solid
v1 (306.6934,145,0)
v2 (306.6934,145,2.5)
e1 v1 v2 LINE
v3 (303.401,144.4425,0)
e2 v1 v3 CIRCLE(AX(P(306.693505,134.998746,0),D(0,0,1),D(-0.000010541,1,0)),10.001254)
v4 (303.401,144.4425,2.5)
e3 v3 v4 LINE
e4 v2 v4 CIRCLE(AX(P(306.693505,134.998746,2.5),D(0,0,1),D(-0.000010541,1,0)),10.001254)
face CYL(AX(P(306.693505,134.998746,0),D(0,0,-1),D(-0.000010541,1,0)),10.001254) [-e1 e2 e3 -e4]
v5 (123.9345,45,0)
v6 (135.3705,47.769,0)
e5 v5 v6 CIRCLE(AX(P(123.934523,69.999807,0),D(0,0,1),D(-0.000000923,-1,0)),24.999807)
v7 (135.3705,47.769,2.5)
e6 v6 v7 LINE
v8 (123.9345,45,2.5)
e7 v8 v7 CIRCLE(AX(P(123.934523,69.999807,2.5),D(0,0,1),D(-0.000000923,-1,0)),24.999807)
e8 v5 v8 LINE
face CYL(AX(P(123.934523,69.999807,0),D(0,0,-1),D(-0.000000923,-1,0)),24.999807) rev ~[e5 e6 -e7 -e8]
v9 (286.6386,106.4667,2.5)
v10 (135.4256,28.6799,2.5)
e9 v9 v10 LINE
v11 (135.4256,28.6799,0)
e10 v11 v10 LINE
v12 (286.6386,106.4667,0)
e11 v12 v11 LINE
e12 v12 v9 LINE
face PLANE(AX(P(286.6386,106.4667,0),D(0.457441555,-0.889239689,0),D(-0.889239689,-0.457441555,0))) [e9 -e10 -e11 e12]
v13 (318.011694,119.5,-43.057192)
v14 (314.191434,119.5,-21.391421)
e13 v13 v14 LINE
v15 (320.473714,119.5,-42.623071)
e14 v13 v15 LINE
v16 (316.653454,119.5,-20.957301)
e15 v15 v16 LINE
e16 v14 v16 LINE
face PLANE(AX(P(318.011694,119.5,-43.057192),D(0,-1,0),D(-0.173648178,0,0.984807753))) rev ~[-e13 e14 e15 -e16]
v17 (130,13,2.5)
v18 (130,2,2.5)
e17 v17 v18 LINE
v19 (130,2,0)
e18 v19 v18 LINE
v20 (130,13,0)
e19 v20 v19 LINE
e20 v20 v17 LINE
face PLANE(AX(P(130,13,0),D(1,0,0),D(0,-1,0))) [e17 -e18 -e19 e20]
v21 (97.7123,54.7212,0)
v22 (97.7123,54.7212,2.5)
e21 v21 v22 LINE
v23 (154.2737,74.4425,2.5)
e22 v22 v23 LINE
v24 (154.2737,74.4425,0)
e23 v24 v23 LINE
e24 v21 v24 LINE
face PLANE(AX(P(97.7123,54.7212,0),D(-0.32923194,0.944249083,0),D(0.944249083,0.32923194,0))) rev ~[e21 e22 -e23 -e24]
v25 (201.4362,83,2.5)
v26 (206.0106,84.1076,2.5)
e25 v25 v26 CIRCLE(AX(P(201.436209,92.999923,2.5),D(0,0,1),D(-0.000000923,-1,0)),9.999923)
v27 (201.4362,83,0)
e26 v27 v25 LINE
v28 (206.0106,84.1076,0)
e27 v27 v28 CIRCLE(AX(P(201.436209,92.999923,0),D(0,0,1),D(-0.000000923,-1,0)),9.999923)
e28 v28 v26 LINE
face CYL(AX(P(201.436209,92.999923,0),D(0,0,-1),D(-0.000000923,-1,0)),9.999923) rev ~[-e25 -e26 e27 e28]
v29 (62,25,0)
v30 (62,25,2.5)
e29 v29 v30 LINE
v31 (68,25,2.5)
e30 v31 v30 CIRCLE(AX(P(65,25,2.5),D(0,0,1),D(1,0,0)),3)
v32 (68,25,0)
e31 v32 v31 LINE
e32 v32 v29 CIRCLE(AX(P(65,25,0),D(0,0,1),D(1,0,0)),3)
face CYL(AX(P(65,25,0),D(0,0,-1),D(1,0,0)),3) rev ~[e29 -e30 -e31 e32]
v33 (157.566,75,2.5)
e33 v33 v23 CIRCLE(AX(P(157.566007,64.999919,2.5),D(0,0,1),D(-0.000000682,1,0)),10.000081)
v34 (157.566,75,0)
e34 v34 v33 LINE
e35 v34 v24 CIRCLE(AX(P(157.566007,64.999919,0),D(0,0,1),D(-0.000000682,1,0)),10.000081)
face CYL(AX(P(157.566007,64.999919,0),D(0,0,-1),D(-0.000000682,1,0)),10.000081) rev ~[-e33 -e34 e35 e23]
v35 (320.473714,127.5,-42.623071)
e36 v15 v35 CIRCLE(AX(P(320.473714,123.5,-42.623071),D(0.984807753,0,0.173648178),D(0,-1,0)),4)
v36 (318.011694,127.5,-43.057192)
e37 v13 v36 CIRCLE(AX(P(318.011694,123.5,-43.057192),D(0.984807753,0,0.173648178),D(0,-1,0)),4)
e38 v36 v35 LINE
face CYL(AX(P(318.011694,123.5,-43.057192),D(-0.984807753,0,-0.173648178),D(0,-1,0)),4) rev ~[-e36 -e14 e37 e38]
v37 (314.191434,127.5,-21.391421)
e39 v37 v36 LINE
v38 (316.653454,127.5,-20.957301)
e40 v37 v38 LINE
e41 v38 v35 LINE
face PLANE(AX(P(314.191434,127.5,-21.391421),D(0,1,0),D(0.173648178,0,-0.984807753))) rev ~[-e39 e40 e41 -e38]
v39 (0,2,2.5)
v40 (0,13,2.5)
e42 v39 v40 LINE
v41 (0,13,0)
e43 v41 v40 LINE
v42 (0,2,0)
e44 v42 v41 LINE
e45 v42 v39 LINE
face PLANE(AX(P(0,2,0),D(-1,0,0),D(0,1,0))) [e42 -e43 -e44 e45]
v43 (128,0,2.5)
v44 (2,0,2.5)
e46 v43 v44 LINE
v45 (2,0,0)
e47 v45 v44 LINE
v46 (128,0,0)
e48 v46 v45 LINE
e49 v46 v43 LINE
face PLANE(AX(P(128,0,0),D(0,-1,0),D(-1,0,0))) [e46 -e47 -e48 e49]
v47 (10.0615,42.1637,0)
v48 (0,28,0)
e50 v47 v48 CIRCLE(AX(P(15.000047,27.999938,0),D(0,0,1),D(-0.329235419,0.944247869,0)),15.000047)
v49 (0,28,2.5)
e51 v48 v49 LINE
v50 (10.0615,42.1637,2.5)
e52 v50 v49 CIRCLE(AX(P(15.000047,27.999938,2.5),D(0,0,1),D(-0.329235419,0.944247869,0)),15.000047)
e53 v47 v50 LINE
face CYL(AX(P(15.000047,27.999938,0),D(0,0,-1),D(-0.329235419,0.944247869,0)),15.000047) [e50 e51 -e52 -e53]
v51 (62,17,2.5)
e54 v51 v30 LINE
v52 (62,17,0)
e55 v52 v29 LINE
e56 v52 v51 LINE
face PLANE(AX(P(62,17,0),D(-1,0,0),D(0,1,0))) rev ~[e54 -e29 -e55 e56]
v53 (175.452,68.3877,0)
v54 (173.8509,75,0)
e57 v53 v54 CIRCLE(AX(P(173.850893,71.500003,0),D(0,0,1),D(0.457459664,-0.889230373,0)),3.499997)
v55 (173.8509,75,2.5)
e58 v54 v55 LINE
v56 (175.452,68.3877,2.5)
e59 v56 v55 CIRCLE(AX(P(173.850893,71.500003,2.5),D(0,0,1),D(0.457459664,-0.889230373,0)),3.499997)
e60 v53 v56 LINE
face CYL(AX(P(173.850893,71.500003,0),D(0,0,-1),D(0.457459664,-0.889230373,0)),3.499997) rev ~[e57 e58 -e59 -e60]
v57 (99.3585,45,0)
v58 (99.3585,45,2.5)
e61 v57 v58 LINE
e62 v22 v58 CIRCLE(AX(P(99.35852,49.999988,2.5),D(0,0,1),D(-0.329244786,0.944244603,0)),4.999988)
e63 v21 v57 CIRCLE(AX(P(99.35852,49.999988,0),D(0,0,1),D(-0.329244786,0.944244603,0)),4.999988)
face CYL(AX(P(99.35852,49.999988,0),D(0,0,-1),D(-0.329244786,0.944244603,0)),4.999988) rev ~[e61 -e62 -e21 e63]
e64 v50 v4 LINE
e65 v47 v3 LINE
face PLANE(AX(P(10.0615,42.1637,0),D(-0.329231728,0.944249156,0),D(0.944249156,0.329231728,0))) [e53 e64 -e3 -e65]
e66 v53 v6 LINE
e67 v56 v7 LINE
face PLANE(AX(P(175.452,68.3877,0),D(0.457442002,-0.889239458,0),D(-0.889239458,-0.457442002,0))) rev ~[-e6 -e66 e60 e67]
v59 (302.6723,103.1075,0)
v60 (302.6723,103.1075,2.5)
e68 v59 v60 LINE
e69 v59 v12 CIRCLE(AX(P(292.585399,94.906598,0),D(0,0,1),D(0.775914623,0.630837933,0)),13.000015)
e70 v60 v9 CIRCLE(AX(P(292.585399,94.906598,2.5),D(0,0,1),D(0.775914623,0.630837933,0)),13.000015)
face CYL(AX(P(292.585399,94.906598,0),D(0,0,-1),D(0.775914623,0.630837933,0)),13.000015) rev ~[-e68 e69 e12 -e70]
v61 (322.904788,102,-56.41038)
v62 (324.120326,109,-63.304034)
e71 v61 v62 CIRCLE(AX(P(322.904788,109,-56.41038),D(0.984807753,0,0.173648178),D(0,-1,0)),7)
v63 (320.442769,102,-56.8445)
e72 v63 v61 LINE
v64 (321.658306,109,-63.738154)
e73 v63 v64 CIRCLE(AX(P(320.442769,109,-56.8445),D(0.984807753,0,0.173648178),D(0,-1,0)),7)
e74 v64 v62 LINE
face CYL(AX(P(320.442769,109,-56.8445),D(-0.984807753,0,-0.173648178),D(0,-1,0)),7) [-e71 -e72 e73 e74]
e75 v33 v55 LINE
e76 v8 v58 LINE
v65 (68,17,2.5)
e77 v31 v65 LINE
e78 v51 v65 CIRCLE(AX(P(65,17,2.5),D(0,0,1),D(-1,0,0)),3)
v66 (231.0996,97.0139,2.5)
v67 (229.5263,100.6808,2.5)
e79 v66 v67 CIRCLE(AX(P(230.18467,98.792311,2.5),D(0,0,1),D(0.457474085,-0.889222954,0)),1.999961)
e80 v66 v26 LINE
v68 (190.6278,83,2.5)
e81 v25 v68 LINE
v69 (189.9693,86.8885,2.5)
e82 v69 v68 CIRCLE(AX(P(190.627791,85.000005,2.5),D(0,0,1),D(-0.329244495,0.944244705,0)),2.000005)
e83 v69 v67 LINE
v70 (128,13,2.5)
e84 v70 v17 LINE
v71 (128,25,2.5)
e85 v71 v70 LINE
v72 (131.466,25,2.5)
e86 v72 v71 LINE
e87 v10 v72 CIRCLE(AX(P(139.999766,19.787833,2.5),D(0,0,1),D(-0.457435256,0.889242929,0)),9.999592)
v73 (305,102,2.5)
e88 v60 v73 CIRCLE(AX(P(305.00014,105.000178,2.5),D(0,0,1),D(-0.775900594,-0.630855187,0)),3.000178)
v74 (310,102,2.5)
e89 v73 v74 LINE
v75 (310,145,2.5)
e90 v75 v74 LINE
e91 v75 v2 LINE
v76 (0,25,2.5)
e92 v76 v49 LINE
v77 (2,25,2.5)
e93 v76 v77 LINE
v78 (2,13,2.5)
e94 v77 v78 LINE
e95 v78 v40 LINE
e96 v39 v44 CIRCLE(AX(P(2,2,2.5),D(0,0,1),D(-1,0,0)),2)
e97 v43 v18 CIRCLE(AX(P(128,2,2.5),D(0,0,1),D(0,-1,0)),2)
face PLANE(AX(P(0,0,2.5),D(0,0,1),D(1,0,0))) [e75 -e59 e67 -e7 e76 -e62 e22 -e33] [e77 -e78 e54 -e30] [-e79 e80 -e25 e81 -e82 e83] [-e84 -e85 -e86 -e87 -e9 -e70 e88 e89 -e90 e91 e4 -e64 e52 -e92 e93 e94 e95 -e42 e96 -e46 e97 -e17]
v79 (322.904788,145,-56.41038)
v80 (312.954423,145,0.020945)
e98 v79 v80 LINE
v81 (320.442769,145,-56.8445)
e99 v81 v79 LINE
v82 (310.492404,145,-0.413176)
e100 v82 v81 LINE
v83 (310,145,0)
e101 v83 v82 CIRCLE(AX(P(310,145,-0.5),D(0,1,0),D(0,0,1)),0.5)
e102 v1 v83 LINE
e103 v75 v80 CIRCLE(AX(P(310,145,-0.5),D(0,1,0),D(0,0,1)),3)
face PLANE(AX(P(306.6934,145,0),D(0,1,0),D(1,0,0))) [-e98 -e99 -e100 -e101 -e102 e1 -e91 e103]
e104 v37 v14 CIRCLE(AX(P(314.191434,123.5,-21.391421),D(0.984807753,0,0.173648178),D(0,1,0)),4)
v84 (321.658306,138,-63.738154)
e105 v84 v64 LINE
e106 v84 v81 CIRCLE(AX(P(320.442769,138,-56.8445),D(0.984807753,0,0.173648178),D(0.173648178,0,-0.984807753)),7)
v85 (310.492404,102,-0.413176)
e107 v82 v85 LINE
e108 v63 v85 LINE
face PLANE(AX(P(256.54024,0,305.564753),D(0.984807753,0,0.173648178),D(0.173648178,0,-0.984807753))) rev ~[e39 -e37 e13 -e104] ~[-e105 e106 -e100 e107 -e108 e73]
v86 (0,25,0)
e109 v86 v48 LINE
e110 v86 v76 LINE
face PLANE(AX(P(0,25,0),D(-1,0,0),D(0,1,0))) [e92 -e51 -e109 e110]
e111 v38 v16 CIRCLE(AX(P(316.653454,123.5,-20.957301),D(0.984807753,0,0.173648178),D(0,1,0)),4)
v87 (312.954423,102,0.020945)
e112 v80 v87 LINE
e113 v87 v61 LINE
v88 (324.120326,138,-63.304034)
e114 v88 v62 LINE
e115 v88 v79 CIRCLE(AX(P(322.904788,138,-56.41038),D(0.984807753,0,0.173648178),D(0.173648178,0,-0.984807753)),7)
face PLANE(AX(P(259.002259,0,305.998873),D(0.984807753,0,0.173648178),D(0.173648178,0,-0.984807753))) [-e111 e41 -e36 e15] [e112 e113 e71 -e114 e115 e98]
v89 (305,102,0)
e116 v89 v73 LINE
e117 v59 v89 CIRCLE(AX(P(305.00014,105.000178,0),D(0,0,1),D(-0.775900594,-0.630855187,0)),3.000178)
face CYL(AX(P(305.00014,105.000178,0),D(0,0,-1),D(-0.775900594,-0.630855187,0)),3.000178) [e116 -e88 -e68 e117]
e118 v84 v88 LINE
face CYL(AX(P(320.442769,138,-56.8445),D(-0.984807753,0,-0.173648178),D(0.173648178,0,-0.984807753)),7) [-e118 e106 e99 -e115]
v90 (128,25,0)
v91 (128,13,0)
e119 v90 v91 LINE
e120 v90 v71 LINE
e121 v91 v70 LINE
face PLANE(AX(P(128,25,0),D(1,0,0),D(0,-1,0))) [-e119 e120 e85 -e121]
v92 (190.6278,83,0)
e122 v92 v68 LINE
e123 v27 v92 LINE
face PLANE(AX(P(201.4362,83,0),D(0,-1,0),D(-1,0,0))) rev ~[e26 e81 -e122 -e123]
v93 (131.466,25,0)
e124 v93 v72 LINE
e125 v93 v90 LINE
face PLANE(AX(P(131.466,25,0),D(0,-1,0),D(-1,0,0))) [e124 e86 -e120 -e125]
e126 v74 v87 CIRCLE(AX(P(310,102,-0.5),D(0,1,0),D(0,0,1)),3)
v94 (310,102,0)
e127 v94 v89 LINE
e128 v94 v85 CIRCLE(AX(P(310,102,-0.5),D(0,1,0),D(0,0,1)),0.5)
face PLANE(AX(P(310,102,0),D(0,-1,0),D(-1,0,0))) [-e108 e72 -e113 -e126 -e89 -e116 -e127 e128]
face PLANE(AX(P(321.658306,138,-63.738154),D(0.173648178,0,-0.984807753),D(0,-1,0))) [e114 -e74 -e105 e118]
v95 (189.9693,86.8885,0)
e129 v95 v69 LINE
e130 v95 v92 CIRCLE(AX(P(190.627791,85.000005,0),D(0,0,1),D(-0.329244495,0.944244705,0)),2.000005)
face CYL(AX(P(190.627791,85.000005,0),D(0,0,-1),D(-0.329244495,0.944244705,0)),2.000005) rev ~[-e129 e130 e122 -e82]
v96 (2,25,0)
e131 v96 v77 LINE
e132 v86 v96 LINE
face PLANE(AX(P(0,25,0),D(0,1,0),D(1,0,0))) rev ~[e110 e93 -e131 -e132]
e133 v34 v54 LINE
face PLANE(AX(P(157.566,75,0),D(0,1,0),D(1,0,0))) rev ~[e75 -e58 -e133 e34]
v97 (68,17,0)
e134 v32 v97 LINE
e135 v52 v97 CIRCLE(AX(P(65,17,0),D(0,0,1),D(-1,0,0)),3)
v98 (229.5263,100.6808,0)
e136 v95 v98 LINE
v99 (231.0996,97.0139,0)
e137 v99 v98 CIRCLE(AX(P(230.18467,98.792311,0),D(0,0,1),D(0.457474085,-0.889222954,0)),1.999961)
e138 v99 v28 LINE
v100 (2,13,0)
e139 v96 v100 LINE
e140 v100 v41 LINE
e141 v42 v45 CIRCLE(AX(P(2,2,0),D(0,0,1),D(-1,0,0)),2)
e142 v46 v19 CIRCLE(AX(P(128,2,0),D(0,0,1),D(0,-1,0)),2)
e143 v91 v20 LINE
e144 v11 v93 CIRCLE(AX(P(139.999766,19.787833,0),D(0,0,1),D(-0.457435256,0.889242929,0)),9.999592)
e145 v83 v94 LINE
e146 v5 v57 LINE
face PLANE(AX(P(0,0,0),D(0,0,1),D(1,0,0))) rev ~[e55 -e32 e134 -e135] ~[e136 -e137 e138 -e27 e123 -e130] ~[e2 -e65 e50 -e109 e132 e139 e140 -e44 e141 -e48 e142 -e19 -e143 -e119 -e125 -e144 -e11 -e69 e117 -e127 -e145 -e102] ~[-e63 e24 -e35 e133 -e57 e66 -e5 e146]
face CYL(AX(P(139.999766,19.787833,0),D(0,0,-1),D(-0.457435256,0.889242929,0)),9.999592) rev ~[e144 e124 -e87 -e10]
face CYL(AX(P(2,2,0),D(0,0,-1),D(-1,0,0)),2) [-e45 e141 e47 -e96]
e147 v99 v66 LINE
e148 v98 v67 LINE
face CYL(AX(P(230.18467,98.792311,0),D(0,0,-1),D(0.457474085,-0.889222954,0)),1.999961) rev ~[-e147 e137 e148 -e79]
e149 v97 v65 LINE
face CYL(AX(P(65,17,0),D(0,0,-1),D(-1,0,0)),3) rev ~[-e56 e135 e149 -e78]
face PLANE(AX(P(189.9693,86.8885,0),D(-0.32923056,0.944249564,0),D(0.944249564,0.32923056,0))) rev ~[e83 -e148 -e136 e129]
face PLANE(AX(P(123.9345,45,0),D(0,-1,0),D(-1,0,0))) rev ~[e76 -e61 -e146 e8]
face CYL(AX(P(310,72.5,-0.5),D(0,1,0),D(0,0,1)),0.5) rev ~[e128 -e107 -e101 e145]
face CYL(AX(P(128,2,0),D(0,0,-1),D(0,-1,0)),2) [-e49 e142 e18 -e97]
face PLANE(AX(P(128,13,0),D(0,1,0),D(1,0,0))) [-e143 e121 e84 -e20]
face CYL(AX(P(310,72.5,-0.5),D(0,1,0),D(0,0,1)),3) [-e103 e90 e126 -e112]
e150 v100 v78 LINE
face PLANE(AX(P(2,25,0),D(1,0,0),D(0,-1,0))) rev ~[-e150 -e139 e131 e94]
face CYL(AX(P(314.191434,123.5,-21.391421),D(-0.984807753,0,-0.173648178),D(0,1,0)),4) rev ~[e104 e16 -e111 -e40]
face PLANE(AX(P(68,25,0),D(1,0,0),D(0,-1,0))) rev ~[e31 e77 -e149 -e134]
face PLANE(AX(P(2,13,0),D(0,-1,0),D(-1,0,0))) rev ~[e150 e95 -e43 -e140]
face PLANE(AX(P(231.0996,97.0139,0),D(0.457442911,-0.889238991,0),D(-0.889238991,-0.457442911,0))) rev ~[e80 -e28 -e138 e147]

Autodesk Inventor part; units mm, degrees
ref_plane "YZ Plane" through (0, 0, 0) normal (1, 0, 0) x (0, 1, 0)
ref_plane "XZ Plane" through (0, 0, 0) normal (0, 1, 0) x (-1, 0, 0)
sketch "草圖1" plane through (0, 0, 0) normal (0, 0, 1) x (1, 0, 0)
  line L0 (0, 0) -> (-7.8042, 0) construction
  line L1 (0, 0) -> (0, -16.694) construction
  line L2 (0, 2) -> (0, 13)
  line L3 (310, 145) -> (310, 102)
  line L4 (130, 19.7875) -> (130, 13) construction
  line L5 (128, 0) -> (2, 0)
  line L6 (310, 145) -> (368, 145)
  line L7 (375, 138) -> (375, 109)
  line L8 (368, 102) -> (310, 102)
  line L9 (332, 127.5) -> (354, 127.5)
  arc A0 (354, 119.5) -> (354, 127.5) centre (354, 123.5) ccw
  line L10 (354, 119.5) -> (332, 119.5)
  arc A1 (332, 127.5) -> (332, 119.5) centre (332, 123.5) ccw
  arc A2 (10.0615, 42.1637) -> (0, 28) centre (15, 28) ccw
  line L11 (10.0615, 42.1637) -> (303.401, 144.4425)
  line L12 (306.6934, 145) -> (310, 145)
  line L13 (310, 102) -> (305, 102)
  line L14 (286.6386, 106.4667) -> (135.4256, 28.6799)
  arc A3 (375, 138) -> (368, 145) centre (368, 138) ccw
  arc A4 (368, 102) -> (375, 109) centre (368, 109) ccw
  arc A5 (302.6723, 103.1075) -> (305, 102) centre (305, 105) ccw
  arc A6 (302.6723, 103.1075) -> (286.6386, 106.4667) centre (292.5854, 94.9066) ccw
  arc A7 (306.6934, 145) -> (303.401, 144.4425) centre (306.6934, 135) ccw
  arc A8 (135.4256, 28.6799) -> (131.466, 25) centre (140, 19.7875) ccw
  line L15 (0, 25) -> (2, 25)
  line L16 (2, 25) -> (2, 13)
  line L17 (2, 13) -> (0, 13)
  line L18 (0, 13) -> (0, 25) construction
  line L19 (65, 0) -> (65, 25) construction
  line L20 (131.466, 25) -> (128, 25)
  line L21 (128, 25) -> (128, 13)
  line L22 (128, 13) -> (130, 13)
  line L23 (130, 13) -> (130, 19.7875) construction
  arc A9 (0, 2) -> (2, 0) centre (2, 2) ccw
  arc A10 (128, 0) -> (130, 2) centre (128, 2) ccw
  line L24 (0, 13) -> (0, 25) construction
  line L25 (0, 25) -> (0, 28)
  line L26 (130, 19.7875) -> (130, 25) construction
  line L27 (130, 13) -> (130, 2)
  line L28 (123.9345, 45) -> (99.3585, 45)
  line L29 (157.566, 75) -> (173.8509, 75)
  line L30 (97.7123, 54.7212) -> (154.2737, 74.4425)
  line L31 (175.452, 68.3877) -> (135.3705, 47.769)
  arc A11 (175.452, 68.3877) -> (173.8509, 75) centre (173.8509, 71.5) ccw
  arc A12 (97.7123, 54.7212) -> (99.3585, 45) centre (99.3585, 50) ccw
  arc A13 (123.9345, 45) -> (135.3705, 47.769) centre (123.9345, 70) ccw
  arc A14 (157.566, 75) -> (154.2737, 74.4425) centre (157.566, 65) ccw
  line L32 (189.9693, 86.8885) -> (229.5263, 100.6808)
  line L33 (231.0996, 97.0139) -> (206.0106, 84.1076)
  line L34 (201.4362, 83) -> (190.6278, 83)
  arc A15 (231.0996, 97.0139) -> (229.5263, 100.6808) centre (230.1847, 98.7923) ccw
  arc A16 (201.4362, 83) -> (206.0106, 84.1076) centre (201.4362, 93) ccw
  arc A17 (189.9693, 86.8885) -> (190.6278, 83) centre (190.6278, 85) ccw
  arc A18 (131.466, 25) -> (130, 19.7875) centre (140, 19.7875) ccw construction
  line L35 (68, 25) -> (68, 17)
  arc A19 (62, 17) -> (68, 17) centre (65, 17) ccw
  line L36 (62, 17) -> (62, 25)
  arc A20 (68, 25) -> (62, 25) centre (65, 25) ccw
  point P0 (130, 0)
  point P1 (375, 145)
  point P2 (375, 102)
  point P3 (130, 25.8889)
  point P4 (305, 145)
  point P5 (305, 102)
  point P6 (305, 115.9121)
  point P7 (0, 10.2)
  point P8 (130, 28)
  point P9 (130, 10.2)
  dimension "d0" = 130
  dimension "d1" = 145
  dimension "d2" = 43
  dimension "d3" = 65
  dimension "d4" = 8
  dimension "d5" = 30
  dimension "d7" = 18
  dimension "d8" = 310
  dimension "d17" = 21.5
  dimension "d20" = 15
  dimension "d21" = 28
  dimension "d23" = 5
  dimension "d24" = 7
  dimension "d26" = 3
  dimension "d29" = 13
  dimension "d30" = 5
  dimension "d31" = 10
  dimension "d32" = 10
  dimension "d33" = 8
  dimension "d39" = 12
  dimension "d40" = 2
  dimension "d41" = 13
  dimension "d42" = 2
  dimension "d45" = 45
  dimension "d46" = 17
  dimension "d47" = 17
  dimension "d48" = 30
  dimension "d49" = 3.5
  dimension "d50" = 5
  dimension "d51" = 25
  dimension "d52" = 10
  dimension "d53" = 8
  dimension "d54" = 2
  dimension "d55" = 10
  dimension "d56" = 2
  dimension "d57" = 19.7875
  dimension "d60" = 6
  dimension "d61" = 8
  dimension "d63" = 17
extrude "擠出1" add sketch "草圖1" along normal blind 2.5
bend part "折彎零件1" radius 0.5 angle 80 line through (310, 145, 0) along (0, -1, 0) centre toward (0, 0, -1) moving side (1, 0, 0) both sides no
ref_plane "工作平面1" through (65, 2, 0) normal (-1, 0, 0) x (0, 0, 1)
properties part number "0 零件" material "不鏽鋼SUS-HL(砂紋)"
